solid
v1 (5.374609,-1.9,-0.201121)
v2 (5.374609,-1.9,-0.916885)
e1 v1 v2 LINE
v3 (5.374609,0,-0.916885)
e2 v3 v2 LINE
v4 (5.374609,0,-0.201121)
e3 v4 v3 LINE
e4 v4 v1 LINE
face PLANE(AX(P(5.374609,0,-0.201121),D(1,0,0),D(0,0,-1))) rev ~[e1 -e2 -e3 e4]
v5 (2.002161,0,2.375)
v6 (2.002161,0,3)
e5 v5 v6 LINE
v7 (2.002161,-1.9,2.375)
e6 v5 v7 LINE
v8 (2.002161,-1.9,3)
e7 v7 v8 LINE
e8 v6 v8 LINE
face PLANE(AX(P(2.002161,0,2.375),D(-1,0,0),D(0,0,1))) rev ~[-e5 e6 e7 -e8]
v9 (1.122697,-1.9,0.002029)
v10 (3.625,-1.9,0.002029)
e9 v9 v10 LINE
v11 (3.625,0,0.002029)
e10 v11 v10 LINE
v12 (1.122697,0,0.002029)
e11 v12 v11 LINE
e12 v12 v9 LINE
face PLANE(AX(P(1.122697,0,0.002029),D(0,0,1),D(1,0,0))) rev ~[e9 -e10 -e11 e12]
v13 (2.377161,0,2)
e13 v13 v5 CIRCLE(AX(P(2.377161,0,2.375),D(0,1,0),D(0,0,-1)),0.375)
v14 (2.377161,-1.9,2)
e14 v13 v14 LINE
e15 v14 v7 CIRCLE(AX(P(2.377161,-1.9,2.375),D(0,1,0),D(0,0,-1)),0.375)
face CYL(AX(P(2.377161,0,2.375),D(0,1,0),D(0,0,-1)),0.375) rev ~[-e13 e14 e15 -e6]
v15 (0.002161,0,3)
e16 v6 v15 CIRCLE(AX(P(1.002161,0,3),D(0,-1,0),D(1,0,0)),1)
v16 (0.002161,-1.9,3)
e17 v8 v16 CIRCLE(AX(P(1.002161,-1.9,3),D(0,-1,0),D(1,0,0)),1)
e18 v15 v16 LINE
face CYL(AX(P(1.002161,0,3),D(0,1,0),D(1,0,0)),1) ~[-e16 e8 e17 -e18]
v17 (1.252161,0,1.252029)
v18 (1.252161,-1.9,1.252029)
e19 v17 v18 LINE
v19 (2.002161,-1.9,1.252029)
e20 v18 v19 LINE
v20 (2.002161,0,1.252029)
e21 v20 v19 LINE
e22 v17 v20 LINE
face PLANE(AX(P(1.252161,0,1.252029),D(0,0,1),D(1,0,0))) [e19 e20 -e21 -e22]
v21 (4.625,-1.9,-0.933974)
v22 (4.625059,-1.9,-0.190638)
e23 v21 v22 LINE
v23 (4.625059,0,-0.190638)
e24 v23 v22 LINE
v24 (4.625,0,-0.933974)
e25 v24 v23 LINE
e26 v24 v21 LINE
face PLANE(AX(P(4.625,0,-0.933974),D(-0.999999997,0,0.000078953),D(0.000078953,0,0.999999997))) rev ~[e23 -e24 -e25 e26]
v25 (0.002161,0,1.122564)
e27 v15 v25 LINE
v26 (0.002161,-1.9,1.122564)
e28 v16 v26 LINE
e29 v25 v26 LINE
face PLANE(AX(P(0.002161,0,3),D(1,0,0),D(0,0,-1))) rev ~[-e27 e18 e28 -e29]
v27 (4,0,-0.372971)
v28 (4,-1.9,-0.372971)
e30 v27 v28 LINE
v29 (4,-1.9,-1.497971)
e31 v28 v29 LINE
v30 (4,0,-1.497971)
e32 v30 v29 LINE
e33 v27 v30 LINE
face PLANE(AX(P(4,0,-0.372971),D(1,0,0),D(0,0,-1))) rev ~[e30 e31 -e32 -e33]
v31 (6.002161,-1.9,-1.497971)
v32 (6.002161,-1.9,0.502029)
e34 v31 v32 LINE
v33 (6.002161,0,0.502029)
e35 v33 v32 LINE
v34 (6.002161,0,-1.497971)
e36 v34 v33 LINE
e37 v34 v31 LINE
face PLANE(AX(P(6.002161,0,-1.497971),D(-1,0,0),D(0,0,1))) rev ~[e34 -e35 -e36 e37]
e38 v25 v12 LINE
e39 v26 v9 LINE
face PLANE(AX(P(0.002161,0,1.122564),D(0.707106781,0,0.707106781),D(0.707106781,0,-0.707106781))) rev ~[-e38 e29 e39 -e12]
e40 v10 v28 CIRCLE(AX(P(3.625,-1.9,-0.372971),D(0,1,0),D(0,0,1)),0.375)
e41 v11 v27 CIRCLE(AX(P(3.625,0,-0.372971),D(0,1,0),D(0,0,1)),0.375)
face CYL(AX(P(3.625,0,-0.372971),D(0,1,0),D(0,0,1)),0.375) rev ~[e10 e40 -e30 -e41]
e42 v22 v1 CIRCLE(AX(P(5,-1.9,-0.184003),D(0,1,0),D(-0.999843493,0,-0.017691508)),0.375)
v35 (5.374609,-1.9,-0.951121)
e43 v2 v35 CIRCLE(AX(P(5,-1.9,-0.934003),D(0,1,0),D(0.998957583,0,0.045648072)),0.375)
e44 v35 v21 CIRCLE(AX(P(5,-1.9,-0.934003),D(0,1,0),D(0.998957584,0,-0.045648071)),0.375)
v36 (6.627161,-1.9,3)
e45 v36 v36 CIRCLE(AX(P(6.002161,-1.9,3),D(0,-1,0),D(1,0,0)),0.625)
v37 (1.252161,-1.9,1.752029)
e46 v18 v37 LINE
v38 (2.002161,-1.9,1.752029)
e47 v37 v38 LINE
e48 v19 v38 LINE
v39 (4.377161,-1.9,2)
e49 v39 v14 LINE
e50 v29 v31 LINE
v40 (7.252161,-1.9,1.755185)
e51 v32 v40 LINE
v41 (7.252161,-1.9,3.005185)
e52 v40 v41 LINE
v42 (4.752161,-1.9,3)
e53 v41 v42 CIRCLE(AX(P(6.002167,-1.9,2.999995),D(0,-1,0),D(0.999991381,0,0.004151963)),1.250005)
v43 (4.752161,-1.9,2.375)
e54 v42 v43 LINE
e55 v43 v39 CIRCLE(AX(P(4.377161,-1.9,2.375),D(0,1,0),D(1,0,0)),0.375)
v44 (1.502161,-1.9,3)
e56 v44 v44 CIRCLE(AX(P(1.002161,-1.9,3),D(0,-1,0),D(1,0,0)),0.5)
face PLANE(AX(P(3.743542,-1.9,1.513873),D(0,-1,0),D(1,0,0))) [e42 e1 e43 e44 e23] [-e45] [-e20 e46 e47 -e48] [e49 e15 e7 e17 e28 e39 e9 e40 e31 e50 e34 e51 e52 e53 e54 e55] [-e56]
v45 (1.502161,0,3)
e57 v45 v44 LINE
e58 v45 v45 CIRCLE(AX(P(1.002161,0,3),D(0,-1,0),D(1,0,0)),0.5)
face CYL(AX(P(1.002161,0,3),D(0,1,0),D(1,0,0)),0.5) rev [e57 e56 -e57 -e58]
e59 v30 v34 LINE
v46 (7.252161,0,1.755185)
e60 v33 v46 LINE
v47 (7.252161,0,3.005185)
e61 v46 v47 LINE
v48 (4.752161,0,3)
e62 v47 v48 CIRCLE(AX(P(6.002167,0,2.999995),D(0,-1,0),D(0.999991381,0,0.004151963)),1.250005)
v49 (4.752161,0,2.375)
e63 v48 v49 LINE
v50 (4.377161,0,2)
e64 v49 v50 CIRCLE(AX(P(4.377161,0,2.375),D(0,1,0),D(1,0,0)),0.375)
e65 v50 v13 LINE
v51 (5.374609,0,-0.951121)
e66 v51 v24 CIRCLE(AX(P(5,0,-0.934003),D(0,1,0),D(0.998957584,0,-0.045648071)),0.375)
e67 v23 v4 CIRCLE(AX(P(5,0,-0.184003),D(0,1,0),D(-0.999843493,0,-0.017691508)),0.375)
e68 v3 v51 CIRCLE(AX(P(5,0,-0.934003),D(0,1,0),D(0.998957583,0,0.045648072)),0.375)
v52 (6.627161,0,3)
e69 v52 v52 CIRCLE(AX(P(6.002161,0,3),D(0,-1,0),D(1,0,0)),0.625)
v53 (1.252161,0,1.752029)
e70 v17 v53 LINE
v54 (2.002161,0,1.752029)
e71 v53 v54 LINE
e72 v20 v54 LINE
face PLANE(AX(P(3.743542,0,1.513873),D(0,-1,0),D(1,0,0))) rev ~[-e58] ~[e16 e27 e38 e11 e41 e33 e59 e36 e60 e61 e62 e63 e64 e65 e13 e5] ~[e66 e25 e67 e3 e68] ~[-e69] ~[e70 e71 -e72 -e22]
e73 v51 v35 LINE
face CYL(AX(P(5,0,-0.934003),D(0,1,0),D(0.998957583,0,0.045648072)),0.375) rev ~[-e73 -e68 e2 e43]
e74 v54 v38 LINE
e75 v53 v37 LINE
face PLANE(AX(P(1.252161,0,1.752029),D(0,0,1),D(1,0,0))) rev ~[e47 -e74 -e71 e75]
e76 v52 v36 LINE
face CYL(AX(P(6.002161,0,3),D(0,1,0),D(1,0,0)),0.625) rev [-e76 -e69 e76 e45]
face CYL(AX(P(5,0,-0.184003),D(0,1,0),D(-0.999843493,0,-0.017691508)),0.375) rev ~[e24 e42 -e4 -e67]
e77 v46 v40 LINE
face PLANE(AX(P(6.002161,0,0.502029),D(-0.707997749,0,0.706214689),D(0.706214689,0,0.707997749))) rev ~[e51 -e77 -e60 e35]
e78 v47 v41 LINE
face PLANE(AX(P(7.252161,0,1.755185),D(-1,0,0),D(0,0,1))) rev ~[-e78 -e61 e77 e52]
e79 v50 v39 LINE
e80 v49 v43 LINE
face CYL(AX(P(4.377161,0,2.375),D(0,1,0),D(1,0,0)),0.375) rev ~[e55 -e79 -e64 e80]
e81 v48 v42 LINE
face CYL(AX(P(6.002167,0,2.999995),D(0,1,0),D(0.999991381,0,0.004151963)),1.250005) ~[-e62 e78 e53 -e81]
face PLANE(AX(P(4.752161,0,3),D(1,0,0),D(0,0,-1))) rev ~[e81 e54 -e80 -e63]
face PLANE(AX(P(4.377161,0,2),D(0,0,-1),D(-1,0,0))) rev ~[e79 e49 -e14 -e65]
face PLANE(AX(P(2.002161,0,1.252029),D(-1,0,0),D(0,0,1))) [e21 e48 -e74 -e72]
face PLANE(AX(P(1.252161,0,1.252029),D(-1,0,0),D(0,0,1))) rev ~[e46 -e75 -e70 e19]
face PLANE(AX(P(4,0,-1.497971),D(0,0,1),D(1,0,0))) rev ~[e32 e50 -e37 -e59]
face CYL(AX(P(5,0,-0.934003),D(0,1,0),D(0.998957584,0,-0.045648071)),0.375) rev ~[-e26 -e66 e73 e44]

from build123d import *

# Parameters (mm, degrees)
F0_W     = 0.75
F0_H     = 0.5
F0_R     = 0.5
F0_R_2   = 0.625
F1_DEPTH = 1.9


# Not quite as in the source:
# - ends of sketch curves that miss each other by under 0.0002 mm in the source are joined


with BuildPart() as f1:
    # F0 (on Front) → F1 (new body)
    with BuildSketch(Plane.XZ):
        with BuildLine():
            Line((0.0021614751, 1.1225641938), (1.122697085, 0.0020285839))
            Line((1.122697085, 0.0020285839), (3.625, 0.0020285839))
            ThreePointArc((3.625, 0.0020285839), (3.8901650429, -0.1078063731), (4, -0.3729714161))
            Line((4, -0.3729714161), (4, -1.4979714161))
            Line((4, -1.4979714161), (6.0021614751, -1.4979714161))
            Line((6.0021614751, -1.4979714161), (6.0021614751, 0.5020285839))
            Line((6.0021614751, 0.5020285839), (7.2521614751, 1.7551845998))
            Line((7.2521614751, 1.7551845998), (7.2521614751, 3))
            Line((7.2521614751, 3), (7.2521614751, 3.0051845998))
            ThreePointArc((7.2521614751, 3.0051845998), (5.9995691919, 4.249997312), (4.7521614751, 3))
            Line((4.7521614751, 3), (4.7521614751, 2.375))
            ThreePointArc((4.7521614751, 2.375), (4.642326518, 2.1098349571), (4.3771614751, 2))
            Line((4.3771614751, 2), (2.3771614751, 2))
            ThreePointArc((2.3771614751, 2), (2.1119964322, 2.1098349571), (2.0021614751, 2.375))
            Line((2.0021614751, 2.375), (2.0021614751, 3))
            ThreePointArc((2.0021614751, 3), (1.0021614751, 4), (0.0021614751, 3))
            Line((0.0021614751, 3), (0.0021614751, 1.1225641938))
        make_face()
        with BuildLine():
            ThreePointArc((5.3746090938, -0.9511214132), (4.9914239554, -1.3089053091), (4.6250000012, -0.9339737791))
            Line((4.6250000012, -0.9339737791), (4.6250586901, -0.1906377023))
            ThreePointArc((4.6250586901, -0.1906377023), (5.0052444867, 0.1909599387), (5.3746090938, -0.2011214132))
            Line((5.3746090938, -0.2011214132), (5.3746090938, -0.9168853601))
            ThreePointArc((5.3746090938, -0.9168853601), (5.375, -0.9340033866), (5.3746090938, -0.9511214132))
        make_face(mode=Mode.SUBTRACT)
        with Locations((1.6271614751, 1.5020285839)):
            Rectangle(F0_W, F0_H, mode=Mode.SUBTRACT)
        with Locations((1.0021614751, 3)):
            Circle(F0_R, mode=Mode.SUBTRACT)
        with Locations((6.0021614751, 3)):
            Circle(F0_R_2, mode=Mode.SUBTRACT)
    extrude(amount=F1_DEPTH)


solid = f1.part
